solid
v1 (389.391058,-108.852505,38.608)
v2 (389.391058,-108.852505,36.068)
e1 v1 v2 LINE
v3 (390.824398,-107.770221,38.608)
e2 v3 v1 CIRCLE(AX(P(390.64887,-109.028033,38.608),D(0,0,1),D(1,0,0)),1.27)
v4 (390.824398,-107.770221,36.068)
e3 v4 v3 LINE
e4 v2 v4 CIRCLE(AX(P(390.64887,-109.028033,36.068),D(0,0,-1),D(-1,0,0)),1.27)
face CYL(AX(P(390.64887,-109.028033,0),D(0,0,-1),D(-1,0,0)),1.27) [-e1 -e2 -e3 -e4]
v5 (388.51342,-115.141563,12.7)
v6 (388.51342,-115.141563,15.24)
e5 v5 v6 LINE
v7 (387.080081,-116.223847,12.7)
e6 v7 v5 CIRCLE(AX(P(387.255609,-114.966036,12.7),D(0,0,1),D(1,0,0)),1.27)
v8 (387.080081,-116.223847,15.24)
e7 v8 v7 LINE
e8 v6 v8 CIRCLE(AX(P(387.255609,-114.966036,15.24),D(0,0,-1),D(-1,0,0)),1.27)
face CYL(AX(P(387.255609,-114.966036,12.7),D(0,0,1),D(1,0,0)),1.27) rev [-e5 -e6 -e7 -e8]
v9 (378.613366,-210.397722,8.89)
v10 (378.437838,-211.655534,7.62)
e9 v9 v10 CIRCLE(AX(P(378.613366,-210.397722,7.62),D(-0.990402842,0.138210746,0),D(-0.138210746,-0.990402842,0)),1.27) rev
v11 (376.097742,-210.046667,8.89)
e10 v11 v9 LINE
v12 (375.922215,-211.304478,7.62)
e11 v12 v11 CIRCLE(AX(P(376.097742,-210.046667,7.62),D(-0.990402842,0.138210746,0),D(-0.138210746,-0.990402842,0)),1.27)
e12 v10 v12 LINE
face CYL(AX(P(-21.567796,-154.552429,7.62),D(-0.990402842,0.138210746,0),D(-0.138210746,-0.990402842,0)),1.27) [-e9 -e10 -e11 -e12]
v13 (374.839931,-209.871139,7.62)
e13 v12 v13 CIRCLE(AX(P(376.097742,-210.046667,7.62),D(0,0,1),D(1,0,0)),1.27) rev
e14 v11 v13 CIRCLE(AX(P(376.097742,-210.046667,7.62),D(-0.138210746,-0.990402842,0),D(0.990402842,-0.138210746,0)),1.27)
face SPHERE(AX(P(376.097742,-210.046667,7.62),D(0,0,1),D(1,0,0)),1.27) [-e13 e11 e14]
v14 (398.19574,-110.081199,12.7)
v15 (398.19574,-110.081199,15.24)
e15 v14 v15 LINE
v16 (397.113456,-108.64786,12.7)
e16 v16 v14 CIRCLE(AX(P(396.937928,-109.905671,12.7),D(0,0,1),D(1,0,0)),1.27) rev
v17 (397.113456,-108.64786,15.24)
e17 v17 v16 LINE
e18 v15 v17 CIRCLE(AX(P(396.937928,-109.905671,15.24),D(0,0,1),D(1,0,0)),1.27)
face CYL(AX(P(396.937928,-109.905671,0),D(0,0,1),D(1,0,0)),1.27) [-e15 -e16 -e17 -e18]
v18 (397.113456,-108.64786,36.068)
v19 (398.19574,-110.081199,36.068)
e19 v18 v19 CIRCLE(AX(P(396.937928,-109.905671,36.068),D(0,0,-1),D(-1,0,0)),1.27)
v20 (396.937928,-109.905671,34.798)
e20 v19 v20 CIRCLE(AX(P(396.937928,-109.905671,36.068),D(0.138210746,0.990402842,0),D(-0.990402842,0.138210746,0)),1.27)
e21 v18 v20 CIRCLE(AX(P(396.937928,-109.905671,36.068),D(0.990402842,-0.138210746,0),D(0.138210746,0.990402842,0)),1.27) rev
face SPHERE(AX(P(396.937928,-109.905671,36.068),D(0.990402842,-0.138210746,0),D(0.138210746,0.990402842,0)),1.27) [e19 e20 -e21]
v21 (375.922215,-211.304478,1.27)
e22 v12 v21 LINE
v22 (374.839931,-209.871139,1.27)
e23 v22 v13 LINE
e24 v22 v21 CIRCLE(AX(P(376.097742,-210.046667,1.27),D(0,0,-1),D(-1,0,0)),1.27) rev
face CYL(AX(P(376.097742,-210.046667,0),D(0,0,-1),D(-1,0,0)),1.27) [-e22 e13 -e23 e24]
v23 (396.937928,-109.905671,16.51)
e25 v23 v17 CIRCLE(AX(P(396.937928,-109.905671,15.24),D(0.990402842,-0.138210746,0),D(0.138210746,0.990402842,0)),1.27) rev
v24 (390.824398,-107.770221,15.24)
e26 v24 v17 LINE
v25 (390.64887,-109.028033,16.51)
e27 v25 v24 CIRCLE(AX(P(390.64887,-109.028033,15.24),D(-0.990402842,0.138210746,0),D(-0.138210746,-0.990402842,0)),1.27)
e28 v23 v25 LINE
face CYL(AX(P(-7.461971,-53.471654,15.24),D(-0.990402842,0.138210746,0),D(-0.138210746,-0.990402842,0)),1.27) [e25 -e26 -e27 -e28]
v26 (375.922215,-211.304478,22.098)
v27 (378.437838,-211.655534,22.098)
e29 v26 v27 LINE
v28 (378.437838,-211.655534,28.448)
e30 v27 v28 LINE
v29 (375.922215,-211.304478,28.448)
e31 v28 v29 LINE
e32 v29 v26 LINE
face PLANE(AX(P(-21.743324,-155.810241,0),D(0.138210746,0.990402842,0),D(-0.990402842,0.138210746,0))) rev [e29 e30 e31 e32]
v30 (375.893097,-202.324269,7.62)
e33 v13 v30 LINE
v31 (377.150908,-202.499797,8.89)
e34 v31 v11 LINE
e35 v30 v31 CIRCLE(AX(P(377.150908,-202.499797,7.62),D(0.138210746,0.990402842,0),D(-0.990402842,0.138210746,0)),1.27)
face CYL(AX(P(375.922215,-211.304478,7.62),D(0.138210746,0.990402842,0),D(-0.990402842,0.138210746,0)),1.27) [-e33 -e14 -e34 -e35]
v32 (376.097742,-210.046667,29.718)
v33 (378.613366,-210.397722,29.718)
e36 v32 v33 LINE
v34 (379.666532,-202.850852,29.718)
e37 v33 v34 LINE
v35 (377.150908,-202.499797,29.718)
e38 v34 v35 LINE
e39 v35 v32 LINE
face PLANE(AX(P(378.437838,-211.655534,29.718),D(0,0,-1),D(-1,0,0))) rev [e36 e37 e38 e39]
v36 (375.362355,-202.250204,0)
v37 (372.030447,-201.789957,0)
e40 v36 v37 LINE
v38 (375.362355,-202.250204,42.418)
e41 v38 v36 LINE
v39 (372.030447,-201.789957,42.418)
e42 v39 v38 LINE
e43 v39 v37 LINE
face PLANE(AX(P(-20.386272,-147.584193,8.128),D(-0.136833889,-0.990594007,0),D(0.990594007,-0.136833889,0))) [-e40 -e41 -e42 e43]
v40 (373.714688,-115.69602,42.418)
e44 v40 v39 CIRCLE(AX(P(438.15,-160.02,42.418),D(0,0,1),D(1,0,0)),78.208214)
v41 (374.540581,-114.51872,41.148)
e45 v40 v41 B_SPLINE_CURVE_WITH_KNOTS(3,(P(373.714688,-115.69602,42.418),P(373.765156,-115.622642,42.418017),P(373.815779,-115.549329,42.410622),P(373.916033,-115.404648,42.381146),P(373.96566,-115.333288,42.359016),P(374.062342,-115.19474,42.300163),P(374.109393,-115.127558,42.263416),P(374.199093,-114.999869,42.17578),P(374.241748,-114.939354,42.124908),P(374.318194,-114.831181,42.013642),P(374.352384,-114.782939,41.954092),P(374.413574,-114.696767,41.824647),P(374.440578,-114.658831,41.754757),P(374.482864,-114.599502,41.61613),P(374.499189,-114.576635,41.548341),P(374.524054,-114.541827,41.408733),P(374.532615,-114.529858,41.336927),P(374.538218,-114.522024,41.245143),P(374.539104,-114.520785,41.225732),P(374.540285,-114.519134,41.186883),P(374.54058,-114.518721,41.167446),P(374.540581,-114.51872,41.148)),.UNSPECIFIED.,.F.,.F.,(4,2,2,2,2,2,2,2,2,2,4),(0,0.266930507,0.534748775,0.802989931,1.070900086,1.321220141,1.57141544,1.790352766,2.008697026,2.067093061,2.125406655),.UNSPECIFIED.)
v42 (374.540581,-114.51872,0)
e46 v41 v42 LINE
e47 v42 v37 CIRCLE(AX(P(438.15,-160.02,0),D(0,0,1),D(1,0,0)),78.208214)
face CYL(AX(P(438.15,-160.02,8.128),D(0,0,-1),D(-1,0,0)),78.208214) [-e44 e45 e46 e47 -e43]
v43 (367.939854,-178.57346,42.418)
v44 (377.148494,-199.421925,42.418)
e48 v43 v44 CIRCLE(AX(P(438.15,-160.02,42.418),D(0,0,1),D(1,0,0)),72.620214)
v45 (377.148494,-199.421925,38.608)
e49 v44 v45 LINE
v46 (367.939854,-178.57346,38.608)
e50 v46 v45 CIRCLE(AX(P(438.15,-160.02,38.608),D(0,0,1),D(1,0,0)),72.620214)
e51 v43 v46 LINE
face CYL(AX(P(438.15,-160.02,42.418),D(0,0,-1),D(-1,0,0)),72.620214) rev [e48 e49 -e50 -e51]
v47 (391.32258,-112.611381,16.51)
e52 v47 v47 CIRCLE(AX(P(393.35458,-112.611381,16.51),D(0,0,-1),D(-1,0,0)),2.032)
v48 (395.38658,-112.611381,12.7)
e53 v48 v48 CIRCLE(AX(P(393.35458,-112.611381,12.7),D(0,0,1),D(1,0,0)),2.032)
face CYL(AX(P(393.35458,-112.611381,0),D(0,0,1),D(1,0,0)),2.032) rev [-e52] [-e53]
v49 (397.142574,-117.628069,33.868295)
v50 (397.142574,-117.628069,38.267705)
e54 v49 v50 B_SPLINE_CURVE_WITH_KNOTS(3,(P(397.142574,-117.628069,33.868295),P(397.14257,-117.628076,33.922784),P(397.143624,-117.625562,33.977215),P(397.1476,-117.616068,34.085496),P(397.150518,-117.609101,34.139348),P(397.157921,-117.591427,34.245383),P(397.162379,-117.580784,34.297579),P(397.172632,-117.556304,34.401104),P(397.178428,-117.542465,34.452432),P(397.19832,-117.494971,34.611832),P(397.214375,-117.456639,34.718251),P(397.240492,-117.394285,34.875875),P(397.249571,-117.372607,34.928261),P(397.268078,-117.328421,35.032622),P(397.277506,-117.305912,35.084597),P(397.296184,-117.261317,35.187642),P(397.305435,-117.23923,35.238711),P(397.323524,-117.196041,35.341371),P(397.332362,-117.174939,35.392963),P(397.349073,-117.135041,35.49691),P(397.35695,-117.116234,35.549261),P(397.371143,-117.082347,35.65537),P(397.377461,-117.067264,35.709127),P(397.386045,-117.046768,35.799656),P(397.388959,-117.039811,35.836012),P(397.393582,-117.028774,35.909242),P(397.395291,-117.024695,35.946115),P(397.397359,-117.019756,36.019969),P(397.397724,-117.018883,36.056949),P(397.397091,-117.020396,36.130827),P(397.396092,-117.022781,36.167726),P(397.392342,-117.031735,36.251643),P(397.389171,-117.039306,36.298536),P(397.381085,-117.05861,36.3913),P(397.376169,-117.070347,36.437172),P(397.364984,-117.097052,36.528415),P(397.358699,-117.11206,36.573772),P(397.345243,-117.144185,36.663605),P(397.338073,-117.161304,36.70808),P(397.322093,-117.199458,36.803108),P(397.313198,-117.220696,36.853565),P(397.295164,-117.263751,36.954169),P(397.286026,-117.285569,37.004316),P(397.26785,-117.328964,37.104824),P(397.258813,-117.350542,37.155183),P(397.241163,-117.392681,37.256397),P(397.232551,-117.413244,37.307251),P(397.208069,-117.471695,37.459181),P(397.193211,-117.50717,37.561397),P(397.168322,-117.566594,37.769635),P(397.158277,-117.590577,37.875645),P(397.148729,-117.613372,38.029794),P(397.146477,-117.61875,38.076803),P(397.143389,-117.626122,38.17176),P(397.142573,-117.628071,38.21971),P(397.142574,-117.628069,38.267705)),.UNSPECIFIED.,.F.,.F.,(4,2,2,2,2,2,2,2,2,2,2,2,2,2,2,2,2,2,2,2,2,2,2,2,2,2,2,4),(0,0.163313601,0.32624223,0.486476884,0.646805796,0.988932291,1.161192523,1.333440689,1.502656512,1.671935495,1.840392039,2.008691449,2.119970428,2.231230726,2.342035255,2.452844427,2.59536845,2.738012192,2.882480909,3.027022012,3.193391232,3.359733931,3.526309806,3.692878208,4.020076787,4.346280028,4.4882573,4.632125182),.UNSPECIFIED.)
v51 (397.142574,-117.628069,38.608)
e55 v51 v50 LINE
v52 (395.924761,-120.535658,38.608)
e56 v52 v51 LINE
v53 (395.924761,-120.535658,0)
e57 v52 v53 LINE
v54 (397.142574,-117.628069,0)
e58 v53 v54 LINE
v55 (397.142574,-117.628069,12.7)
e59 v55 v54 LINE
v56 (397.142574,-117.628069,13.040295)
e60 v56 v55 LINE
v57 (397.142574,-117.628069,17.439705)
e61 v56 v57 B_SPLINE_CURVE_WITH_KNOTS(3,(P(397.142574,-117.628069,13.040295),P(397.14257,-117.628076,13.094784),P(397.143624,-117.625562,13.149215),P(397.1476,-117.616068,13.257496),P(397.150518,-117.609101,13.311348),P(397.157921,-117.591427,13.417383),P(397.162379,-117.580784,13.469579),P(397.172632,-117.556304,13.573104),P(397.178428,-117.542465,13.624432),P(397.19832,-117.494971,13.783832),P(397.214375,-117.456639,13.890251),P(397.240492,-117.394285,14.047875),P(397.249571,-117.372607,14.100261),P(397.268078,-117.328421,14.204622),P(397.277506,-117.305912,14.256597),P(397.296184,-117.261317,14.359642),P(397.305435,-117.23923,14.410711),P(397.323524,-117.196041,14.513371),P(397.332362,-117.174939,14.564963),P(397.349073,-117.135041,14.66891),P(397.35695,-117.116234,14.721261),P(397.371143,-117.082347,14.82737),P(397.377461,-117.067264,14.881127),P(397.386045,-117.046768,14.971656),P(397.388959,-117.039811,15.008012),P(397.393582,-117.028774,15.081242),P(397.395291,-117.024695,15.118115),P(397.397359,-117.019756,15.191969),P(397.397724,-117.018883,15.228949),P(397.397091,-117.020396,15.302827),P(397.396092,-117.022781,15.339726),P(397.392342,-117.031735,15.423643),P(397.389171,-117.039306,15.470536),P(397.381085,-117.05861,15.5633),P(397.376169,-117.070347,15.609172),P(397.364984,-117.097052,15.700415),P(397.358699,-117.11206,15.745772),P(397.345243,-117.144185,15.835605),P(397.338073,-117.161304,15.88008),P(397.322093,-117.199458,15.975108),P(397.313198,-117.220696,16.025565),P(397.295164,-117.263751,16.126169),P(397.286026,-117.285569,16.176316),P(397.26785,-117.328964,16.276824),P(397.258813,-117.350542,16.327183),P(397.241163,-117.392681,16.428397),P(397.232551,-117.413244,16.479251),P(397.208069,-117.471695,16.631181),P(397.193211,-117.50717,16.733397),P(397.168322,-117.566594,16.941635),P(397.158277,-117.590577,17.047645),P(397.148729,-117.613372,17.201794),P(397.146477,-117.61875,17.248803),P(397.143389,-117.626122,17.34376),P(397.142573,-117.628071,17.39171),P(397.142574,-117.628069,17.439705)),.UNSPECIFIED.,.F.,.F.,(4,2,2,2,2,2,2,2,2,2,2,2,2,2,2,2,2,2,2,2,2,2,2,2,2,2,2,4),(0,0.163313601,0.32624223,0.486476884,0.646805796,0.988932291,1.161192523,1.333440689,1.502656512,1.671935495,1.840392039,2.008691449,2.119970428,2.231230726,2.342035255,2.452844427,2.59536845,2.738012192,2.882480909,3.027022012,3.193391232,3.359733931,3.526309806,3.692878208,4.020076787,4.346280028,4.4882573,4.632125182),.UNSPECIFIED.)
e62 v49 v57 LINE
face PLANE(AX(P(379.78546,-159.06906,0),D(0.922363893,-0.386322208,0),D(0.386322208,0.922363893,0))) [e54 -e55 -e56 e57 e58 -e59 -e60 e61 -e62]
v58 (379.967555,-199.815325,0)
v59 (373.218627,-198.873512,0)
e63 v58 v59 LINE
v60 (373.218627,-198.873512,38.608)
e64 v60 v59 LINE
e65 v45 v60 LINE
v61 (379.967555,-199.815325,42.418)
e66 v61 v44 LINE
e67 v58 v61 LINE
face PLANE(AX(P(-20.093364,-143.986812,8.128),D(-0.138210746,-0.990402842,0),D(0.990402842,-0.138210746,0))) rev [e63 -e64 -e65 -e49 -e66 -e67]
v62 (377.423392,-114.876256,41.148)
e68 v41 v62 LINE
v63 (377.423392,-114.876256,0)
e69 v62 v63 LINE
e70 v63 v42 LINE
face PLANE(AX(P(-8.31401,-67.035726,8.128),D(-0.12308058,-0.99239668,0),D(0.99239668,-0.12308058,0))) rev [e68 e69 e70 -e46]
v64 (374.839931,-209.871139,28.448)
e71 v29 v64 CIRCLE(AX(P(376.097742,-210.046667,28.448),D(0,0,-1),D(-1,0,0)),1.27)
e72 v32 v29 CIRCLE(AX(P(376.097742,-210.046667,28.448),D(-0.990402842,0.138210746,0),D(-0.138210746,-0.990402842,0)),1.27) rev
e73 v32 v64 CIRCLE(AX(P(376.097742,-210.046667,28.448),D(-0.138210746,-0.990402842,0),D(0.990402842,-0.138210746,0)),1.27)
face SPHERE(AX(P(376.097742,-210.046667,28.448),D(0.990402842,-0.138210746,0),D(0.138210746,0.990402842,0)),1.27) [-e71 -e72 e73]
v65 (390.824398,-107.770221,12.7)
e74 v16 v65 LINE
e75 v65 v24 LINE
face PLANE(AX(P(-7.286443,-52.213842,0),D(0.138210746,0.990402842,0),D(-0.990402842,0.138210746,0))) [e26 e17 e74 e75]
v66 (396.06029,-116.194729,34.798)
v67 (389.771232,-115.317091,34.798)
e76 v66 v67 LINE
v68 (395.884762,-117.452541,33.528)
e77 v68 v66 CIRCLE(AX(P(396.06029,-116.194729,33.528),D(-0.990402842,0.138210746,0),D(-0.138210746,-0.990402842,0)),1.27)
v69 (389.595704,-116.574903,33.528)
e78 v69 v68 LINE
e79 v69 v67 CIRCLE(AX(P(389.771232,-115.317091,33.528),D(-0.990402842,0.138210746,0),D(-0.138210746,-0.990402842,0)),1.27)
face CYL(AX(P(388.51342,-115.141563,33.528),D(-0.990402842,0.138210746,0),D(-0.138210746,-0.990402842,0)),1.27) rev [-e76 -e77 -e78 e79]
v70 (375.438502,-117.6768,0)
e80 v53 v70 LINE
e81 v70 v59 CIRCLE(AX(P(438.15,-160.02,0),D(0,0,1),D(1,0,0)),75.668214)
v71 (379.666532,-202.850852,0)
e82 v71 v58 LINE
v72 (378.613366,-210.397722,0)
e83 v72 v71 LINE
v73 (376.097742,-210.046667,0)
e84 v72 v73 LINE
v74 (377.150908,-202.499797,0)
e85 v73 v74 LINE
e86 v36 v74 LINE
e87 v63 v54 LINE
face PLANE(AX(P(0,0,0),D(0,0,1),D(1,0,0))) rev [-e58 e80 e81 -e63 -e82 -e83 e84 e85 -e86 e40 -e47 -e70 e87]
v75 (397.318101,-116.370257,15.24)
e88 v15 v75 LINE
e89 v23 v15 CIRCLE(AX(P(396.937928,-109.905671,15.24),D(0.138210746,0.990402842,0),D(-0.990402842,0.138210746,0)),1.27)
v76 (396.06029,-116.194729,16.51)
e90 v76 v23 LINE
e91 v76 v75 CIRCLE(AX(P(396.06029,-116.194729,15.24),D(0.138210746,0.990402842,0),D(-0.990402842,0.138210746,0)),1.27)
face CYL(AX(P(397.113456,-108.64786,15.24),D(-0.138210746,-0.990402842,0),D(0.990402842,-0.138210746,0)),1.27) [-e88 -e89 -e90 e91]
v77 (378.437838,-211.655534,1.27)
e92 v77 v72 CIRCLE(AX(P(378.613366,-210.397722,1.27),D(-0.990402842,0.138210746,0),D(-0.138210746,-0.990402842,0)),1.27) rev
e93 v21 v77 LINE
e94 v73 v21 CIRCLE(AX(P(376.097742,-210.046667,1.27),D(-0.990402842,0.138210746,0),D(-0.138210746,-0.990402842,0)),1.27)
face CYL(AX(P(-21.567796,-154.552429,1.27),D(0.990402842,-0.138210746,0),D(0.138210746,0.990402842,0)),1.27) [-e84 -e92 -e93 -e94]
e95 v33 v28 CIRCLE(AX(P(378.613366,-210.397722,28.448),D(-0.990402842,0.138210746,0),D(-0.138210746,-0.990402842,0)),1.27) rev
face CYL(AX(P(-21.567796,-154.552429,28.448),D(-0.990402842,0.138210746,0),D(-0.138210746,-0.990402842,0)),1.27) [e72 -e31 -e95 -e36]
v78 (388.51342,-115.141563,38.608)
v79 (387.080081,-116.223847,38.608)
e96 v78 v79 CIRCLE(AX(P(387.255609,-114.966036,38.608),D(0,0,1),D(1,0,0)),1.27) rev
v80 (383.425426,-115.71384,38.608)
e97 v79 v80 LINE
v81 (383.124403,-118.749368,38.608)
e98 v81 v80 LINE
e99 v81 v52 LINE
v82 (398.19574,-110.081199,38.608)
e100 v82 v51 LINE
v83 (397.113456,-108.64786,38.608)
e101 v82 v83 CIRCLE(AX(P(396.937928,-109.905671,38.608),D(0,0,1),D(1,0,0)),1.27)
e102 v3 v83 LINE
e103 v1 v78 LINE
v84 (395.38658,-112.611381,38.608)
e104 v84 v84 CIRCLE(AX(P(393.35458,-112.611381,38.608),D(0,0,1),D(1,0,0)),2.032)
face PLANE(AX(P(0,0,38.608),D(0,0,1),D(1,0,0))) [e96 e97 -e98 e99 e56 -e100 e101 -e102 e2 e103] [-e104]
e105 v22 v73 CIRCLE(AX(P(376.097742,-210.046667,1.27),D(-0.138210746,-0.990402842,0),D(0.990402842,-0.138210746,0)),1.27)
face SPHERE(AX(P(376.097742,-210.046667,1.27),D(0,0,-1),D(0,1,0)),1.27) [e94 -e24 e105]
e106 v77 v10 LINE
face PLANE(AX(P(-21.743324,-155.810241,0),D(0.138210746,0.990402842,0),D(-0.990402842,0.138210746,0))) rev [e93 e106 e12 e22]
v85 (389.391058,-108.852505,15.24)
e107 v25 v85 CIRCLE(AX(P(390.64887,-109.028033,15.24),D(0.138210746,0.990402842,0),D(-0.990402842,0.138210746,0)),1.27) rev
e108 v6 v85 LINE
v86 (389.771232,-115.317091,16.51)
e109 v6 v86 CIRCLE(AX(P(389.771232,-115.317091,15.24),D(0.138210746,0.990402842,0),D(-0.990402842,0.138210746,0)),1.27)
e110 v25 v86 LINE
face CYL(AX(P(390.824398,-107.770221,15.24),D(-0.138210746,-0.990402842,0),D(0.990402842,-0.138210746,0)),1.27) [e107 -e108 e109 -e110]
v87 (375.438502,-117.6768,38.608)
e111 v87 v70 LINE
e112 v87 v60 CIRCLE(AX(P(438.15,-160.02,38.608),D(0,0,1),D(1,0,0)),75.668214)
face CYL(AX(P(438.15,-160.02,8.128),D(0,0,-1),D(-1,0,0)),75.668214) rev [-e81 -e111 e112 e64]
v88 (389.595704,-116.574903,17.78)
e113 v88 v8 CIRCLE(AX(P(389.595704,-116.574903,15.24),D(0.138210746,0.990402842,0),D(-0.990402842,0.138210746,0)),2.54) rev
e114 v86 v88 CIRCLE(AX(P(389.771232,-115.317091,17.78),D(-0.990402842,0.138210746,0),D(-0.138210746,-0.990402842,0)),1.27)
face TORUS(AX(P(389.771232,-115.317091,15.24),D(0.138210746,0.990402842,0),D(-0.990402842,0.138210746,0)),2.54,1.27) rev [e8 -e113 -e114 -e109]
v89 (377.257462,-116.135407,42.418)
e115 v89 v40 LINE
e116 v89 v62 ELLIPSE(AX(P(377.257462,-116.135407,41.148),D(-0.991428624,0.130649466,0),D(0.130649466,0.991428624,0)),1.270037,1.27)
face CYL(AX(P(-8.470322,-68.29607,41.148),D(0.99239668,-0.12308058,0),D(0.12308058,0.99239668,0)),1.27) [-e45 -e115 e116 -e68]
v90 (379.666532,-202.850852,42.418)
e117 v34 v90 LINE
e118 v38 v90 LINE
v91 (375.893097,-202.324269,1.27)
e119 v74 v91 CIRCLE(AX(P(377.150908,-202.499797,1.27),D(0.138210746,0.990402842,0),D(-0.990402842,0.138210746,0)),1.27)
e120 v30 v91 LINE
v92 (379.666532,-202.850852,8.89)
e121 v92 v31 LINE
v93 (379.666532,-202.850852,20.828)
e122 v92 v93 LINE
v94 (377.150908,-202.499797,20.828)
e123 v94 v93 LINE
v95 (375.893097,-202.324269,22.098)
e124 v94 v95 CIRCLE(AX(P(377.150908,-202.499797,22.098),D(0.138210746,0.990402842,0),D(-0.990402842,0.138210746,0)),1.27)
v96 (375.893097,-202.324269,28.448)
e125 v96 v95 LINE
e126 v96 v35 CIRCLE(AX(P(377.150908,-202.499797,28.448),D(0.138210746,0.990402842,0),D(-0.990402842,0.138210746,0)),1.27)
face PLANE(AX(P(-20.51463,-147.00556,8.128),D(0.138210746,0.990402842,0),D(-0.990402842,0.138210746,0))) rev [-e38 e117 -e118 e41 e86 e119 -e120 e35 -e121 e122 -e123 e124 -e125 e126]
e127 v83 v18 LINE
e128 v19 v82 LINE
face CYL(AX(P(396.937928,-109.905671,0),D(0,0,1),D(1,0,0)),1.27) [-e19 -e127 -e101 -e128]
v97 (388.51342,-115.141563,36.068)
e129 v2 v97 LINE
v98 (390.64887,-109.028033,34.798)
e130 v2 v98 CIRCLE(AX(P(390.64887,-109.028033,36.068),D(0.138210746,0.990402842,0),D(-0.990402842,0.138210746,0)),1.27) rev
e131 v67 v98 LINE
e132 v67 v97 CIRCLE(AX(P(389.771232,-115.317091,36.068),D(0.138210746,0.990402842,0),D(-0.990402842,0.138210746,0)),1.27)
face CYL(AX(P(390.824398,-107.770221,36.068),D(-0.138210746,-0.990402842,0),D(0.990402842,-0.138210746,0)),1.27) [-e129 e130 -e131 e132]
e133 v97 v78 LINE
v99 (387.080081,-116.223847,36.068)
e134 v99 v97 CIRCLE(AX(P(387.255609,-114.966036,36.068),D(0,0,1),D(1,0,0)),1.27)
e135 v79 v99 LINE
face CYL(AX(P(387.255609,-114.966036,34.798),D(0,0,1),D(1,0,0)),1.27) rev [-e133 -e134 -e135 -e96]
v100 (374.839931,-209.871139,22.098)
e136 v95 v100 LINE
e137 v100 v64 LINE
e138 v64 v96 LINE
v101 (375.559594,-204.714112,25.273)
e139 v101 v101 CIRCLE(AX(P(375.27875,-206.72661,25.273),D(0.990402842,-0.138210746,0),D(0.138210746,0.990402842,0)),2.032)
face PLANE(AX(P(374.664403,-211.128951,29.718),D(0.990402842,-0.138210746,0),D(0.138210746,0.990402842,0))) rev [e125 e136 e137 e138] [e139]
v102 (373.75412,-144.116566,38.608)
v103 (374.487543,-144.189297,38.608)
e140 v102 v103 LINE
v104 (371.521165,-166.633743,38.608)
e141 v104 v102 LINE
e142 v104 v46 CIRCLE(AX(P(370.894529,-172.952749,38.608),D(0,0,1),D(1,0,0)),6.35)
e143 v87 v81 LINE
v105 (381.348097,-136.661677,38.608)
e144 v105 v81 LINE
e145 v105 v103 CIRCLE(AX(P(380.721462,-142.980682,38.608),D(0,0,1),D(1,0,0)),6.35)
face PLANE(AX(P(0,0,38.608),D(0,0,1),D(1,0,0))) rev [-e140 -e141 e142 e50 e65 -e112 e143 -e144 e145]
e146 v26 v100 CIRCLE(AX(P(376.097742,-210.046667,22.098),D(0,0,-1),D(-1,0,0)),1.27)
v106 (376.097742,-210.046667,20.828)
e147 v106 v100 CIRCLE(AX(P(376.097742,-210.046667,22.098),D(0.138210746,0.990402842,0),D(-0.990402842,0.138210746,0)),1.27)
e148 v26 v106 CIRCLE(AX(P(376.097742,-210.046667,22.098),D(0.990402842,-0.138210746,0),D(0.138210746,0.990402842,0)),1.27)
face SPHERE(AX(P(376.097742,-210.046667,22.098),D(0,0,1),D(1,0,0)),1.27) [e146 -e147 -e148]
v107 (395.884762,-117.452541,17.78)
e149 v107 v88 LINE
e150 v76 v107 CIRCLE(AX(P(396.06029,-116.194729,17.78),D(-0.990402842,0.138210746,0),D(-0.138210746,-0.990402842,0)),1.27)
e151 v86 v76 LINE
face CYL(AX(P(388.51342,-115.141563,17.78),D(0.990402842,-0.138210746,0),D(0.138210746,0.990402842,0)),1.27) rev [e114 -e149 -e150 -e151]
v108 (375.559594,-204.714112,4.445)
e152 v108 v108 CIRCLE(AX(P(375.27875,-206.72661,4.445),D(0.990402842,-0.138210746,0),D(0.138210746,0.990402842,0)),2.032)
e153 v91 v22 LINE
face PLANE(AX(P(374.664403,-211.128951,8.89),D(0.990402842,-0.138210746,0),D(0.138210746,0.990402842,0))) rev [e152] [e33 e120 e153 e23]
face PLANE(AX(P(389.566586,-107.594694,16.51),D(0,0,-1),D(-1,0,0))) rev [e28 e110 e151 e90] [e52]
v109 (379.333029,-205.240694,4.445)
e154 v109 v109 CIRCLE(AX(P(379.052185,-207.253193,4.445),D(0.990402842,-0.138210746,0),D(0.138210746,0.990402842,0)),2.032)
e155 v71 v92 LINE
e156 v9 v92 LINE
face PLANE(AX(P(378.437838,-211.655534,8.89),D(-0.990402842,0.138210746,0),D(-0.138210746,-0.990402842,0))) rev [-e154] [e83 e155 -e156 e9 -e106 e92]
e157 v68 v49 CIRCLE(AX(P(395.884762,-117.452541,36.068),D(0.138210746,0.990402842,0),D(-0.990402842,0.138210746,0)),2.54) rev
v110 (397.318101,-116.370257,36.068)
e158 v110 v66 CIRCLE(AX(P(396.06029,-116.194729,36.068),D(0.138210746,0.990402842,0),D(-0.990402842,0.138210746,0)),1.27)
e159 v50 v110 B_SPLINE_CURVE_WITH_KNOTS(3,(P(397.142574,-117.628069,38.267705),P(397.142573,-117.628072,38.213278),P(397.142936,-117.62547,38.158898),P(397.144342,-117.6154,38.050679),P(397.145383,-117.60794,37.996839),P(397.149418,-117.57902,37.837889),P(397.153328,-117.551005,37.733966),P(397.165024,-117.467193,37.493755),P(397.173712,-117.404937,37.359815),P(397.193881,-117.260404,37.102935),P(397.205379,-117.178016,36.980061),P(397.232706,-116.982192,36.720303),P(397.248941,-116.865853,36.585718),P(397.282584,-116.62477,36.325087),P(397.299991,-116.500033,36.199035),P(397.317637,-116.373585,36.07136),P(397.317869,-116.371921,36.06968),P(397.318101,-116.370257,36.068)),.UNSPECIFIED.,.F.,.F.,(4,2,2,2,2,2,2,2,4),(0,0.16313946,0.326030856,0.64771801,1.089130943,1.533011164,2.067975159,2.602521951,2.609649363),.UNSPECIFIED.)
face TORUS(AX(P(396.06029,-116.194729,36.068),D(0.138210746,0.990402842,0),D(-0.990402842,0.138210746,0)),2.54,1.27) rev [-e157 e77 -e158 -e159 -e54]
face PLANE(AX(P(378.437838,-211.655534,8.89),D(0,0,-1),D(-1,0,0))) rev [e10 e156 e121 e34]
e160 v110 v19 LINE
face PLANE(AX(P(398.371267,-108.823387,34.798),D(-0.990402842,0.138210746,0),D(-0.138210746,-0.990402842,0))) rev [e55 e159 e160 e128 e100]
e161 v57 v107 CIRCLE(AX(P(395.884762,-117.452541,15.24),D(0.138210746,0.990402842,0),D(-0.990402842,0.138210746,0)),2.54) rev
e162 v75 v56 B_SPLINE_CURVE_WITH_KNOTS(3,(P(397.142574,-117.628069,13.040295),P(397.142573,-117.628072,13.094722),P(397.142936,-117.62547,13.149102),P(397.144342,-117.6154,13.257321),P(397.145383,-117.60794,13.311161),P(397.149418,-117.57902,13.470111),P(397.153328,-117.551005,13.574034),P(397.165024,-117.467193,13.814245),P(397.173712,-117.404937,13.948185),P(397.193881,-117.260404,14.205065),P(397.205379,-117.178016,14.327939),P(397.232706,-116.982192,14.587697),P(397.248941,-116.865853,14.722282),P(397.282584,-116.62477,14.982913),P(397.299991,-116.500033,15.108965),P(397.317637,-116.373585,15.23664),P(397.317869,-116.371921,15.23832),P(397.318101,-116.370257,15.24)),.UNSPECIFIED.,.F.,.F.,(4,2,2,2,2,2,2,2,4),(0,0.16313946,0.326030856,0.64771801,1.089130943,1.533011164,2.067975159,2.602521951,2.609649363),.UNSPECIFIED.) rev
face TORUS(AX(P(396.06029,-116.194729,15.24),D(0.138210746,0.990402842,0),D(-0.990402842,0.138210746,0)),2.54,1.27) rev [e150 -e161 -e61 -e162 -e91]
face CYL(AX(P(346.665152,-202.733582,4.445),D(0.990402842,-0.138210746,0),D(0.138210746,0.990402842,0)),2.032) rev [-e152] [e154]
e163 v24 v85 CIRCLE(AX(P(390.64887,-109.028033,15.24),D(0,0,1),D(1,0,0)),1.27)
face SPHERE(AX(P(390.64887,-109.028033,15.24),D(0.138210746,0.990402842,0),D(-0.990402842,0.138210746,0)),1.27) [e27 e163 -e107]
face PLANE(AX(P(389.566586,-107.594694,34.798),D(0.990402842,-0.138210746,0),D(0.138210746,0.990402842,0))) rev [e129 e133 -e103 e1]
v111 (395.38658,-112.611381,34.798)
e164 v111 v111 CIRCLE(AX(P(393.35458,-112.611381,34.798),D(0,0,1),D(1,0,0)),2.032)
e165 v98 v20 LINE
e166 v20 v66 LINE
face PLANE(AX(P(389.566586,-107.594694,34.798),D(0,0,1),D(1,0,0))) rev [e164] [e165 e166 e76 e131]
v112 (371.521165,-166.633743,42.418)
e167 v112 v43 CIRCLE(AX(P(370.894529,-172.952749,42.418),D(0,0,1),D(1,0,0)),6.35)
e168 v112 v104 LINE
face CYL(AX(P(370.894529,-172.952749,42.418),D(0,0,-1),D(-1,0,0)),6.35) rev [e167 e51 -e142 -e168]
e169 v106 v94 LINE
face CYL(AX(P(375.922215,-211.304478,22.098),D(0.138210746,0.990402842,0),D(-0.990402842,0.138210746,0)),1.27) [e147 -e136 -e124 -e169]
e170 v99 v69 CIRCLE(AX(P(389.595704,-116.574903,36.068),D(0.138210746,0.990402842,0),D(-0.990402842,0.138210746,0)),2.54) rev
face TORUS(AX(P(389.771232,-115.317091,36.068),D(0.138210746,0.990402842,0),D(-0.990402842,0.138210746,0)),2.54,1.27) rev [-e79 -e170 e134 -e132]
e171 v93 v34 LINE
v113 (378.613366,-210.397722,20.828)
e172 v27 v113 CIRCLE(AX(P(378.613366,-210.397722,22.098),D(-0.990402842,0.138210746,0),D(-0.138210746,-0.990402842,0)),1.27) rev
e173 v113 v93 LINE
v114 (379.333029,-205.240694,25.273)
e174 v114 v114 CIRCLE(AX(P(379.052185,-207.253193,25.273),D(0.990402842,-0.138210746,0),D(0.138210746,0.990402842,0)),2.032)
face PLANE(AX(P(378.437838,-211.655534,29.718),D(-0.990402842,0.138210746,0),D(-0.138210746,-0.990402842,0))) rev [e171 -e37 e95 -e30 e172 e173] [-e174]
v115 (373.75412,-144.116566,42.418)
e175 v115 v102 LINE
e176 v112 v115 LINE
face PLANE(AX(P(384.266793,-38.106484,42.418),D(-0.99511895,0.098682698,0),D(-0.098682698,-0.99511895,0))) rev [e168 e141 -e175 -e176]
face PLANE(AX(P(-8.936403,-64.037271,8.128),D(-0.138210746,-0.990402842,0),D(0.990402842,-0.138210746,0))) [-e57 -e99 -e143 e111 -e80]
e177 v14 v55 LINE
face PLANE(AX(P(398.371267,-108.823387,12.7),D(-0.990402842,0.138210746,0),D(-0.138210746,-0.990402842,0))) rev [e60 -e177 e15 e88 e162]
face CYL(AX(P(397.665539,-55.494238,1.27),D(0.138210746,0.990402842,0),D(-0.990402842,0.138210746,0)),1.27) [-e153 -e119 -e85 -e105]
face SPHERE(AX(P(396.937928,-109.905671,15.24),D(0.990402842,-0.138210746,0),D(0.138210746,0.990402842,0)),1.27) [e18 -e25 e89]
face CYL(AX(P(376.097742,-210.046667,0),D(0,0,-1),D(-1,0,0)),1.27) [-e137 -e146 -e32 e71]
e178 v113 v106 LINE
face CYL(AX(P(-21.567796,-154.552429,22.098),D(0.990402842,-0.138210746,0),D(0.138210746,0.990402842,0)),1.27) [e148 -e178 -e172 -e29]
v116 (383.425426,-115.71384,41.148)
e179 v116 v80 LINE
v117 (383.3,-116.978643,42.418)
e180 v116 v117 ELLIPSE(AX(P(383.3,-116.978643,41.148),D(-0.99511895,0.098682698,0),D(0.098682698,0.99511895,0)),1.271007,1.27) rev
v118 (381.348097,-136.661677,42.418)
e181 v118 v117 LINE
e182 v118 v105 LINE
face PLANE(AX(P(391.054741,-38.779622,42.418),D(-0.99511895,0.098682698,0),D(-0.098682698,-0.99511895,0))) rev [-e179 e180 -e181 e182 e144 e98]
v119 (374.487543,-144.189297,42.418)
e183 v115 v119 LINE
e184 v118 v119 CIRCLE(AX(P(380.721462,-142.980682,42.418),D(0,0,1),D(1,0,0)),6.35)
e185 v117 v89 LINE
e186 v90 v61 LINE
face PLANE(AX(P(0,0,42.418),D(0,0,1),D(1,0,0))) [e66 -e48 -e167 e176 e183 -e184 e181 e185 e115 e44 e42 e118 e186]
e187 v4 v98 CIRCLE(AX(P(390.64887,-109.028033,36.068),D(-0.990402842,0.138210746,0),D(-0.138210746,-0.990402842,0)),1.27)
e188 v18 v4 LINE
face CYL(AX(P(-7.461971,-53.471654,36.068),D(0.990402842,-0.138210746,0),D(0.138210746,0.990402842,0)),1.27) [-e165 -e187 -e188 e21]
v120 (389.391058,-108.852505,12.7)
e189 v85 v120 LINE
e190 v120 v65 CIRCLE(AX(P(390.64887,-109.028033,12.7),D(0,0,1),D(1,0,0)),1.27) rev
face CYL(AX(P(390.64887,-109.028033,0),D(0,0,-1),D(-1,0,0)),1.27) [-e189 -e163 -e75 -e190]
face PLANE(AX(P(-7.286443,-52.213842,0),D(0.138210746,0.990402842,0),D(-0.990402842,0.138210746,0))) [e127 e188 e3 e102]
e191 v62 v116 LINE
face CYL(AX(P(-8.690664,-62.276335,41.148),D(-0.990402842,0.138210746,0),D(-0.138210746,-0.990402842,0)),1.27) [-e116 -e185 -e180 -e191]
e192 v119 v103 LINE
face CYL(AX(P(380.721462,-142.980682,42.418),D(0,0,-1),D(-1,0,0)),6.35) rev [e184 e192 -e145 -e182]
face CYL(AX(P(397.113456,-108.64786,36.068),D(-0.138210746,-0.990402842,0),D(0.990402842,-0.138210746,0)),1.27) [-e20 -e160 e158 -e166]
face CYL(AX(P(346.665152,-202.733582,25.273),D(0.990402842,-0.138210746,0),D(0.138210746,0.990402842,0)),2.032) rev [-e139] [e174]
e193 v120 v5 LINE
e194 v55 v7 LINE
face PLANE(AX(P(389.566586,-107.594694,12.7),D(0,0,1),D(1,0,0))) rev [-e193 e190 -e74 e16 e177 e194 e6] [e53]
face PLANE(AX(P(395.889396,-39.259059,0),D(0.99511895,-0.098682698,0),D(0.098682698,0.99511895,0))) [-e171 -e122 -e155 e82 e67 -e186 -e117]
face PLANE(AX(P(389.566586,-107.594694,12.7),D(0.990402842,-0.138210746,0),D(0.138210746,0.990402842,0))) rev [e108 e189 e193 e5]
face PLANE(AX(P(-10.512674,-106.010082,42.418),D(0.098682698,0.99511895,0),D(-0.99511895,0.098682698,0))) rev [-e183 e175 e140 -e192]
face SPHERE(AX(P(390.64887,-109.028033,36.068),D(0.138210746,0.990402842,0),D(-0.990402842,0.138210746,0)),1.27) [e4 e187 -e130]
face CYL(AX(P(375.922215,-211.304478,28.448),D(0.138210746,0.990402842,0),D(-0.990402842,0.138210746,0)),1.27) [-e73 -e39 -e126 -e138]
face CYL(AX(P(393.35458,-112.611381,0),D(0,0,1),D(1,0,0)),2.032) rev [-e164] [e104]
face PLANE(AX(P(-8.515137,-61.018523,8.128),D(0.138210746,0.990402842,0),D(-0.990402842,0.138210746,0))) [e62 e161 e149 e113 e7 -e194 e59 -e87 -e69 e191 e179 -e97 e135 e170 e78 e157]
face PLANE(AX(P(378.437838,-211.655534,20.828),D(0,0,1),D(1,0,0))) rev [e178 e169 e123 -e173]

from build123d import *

# Parameters (mm, degrees)
SKETCH1_R                = 4.445
BOSS_EXTRUDE2_DEPTH      = 8.128
BOSS_EXTRUDE3_DEPTH      = 30.48
CUT_EXTRUDE1_START       = -38.608
CUT_EXTRUDE1_OUTLINE_R   = 4.445
CUT_EXTRUDE1_DEPTH       = 38.608
BOSS_EXTRUDE13_DEPTH     = 3.81
BOSS_EXTRUDE14_DEPTH     = 8.128
BOSS_EXTRUDE15_OUTLINE_W = 8.89
BOSS_EXTRUDE15_OUTLINE_H = 3.81
BOSS_EXTRUDE15_DEPTH     = 8.89
SKETCH10_W               = 3.81
SKETCH10_H               = 8.89
BOSS_EXTRUDE16_DEPTH     = 8.89
SKETCH11_R               = 2.032
CUT_EXTRUDE3_DEPTH       = 453.756346398
SKETCH12_R               = 2.032
CUT_EXTRUDE4_DEPTH       = 167.419125065
FILLET1_R                = 1.27
FILLET2_R                = 1.27
FILLET3_R                = 1.27


# Read off the part's stored shape, not the designer's step: Cut-Extrude1, Boss-Extrude15
with BuildPart() as part:
    # Sketch1 → Boss-Extrude2 (new body)
    with BuildSketch(Plane.XY):
        with BuildLine():
            Line((422.721831239, -137.260955008), (397.142573767, -117.628068619))
            Line((397.142573767, -117.628068619), (377.42339183, -114.876256201))
            Line((377.42339183, -114.876256201), (374.540581179, -114.51871973))
            ThreePointArc((374.540581179, -114.51871973), (359.974116362, -157.771470169), (372.030446696, -201.789957384))
            Line((372.030446696, -201.789957384), (375.362354889, -202.25020442))
            Line((375.362354889, -202.25020442), (407.292032563, -206.705991877))
            Line((407.292032563, -206.705991877), (428.301760664, -185.691281663))
            ThreePointArc((428.301760664, -185.691281663), (410.835199313, -163.167091308), (422.721831239, -137.260955008))
        make_face()
        with Locations((413.081283236, -189.895733265)):
            Circle(SKETCH1_R, mode=Mode.SUBTRACT)
        with BuildLine():
            Line((375.438501949, -117.676800355), (395.924761017, -120.535658409))
            Line((395.924761017, -120.535658409), (403.250926595, -126.158721416))
            Line((403.250926595, -126.158721416), (396.525446728, -140.500644454))
            ThreePointArc((396.525446728, -140.500644454), (394.840250533, -144.59682662), (393.557057048, -148.836167256))
            Line((393.557057048, -148.836167256), (408.135947471, -152.492527686))
            ThreePointArc((408.135947471, -152.492527686), (407.478732389, -164.116282679), (411.163311063, -175.160172021))
            Line((411.163311063, -175.160172021), (398.054918567, -182.514290852))
            ThreePointArc((398.054918567, -182.514290852), (404.027476783, -190.830097132), (411.692336104, -197.617881552))
            ThreePointArc((411.692336104, -197.617881552), (411.8058947, -197.693319009), (411.923337289, -197.76255486))
            Line((411.923337289, -197.76255486), (406.209814322, -203.477432695))
            Line((406.209814322, -203.477432695), (373.21862712, -198.873511552))
            ThreePointArc((373.21862712, -198.873511552), (362.510049562, -157.95204405), (375.438501949, -117.676800355))
        make_face(mode=Mode.SUBTRACT)
        with Locations((404.375009271, -140.520000011)):
            Circle(SKETCH1_R, mode=Mode.SUBTRACT)
    extrude(amount=BOSS_EXTRUDE2_DEPTH)


with BuildPart() as body_2:
    # Sketch2 → Boss-Extrude3 (new body)
    with BuildSketch(Plane.XY.offset(8.128)):
        with BuildLine():
            Line((397.142573767, -117.628068619), (377.42339183, -114.876256201))
            Line((377.42339183, -114.876256201), (374.540581179, -114.51871973))
            ThreePointArc((374.540581179, -114.51871973), (359.974116362, -157.771470169), (372.030446696, -201.789957384))
            Line((372.030446696, -201.789957384), (375.362354889, -202.25020442))
            Line((375.362354889, -202.25020442), (407.292032563, -206.705991877))
            Line((407.292032563, -206.705991877), (414.532433241, -199.463874257))
            ThreePointArc((414.532433241, -199.463874257), (409.852770309, -196.253623443), (405.604270928, -192.491282623))
            ThreePointArc((405.604270928, -192.491282623), (405.997230199, -190.639893213), (406.27151817, -188.767241124))
            ThreePointArc((406.27151817, -188.767241124), (395.867947628, -167.427396522), (398.397521154, -143.821793259))
            ThreePointArc((398.397521154, -143.821793259), (398.461114435, -137.105611235), (404.245702044, -133.692446827))
            ThreePointArc((404.245702044, -133.692446827), (407.006708255, -130.47787998), (410.071206758, -127.551201961))
            Line((410.071206758, -127.551201961), (397.142573767, -117.628068619))
        make_face()
        with BuildLine():
            ThreePointArc((403.061727172, -189.725585097), (401.059193553, -196.35778198), (397.415632908, -202.25020442))
            Line((397.415632908, -202.25020442), (373.21862712, -198.873511552))
            ThreePointArc((373.21862712, -198.873511552), (362.510049562, -157.95204405), (375.438501949, -117.676800355))
            Line((375.438501949, -117.676800355), (395.924761017, -120.535658409))
            Line((395.924761017, -120.535658409), (400.202083686, -123.818638382))
            ThreePointArc((400.202083686, -123.818638382), (401.150247915, -126.46196405), (401.831128402, -129.1864067))
            Line((401.831128402, -129.1864067), (400.808060919, -131.368073344))
            ThreePointArc((400.808060919, -131.368073344), (395.439235277, -136.441663908), (395.124115066, -143.821793259))
            ThreePointArc((395.124115066, -143.821793259), (392.848289911, -167.853501069), (403.061727172, -189.725585097))
        make_face(mode=Mode.SUBTRACT)
    extrude(amount=BOSS_EXTRUDE3_DEPTH)


with BuildPart() as cut_extrude1_tool:
    # Cut-Extrude1 outline → Cut-Extrude1 (new body)
    with BuildSketch(Plane.XY.offset(38.608).offset(CUT_EXTRUDE1_START)):
        with BuildLine():
            Line((397.142573767, -117.628068619), (395.924761017, -120.535658409))
            Line((395.924761017, -120.535658409), (400.202083686, -123.818638382))
            ThreePointArc((400.202083686, -123.818638382), (401.150247915, -126.46196405), (401.831128402, -129.1864067))
            Line((401.831128402, -129.1864067), (400.808060919, -131.368073344))
            ThreePointArc((400.808060919, -131.368073344), (395.439235277, -136.441663908), (395.124115066, -143.821793259))
            ThreePointArc((395.124115066, -143.821793259), (394.268902285, -146.306578133), (393.557057048, -148.836167256))
            ThreePointArc((393.557057048, -148.836167256), (392.580609278, -166.105992541), (398.054918568, -182.514290852))
            ThreePointArc((398.054918568, -182.514290852), (400.385798954, -186.239721497), (403.061727172, -189.725585097))
            ThreePointArc((403.061727172, -189.725585097), (401.059193553, -196.35778198), (397.415632908, -202.25020442))
            Line((397.415632908, -202.25020442), (379.967554953, -199.815324629))
            Line((379.967554953, -199.815324629), (379.666531571, -202.850852403))
            Line((379.666531571, -202.850852403), (407.292032563, -206.705991877))
            Line((407.292032563, -206.705991877), (428.301760664, -185.691281663))
            ThreePointArc((428.301760664, -185.691281663), (410.835199313, -163.167091308), (422.721831239, -137.260955008))
            Line((422.721831239, -137.260955008), (397.142573767, -117.628068619))
        make_face()
        with BuildLine():
            Line((411.923337289, -197.76255486), (411.913410508, -197.772483995))
            ThreePointArc((411.913410508, -197.772483995), (411.802759907, -197.695344929), (411.692336104, -197.617881552))
            ThreePointArc((411.692336104, -197.617881552), (411.8058947, -197.693319009), (411.923337289, -197.76255486))
        make_face(mode=Mode.SUBTRACT)
        with BuildLine():
            Line((411.163311063, -175.160172021), (400.71315601, -181.022956652))
            ThreePointArc((400.71315601, -181.022956652), (395.601784353, -165.702501323), (396.513495254, -149.57763683))
            Line((396.513495254, -149.57763683), (408.135947471, -152.492527686))
            ThreePointArc((408.135947471, -152.492527686), (407.478732389, -164.116282679), (411.163311063, -175.160172021))
        make_face(mode=Mode.SUBTRACT)
        with Locations((404.375009271, -140.520000011)):
            Circle(CUT_EXTRUDE1_OUTLINE_R, mode=Mode.SUBTRACT)
        with Locations((413.081283236, -189.895733265)):
            Circle(CUT_EXTRUDE1_OUTLINE_R, mode=Mode.SUBTRACT)
    extrude(amount=CUT_EXTRUDE1_DEPTH)


with BuildPart() as part_1:
    add(part.part)

    # Cut-Extrude1: cut by cut_extrude1_tool
    add(cut_extrude1_tool.part, mode=Mode.SUBTRACT)



with BuildPart() as body_2_1:
    add(body_2.part)

    # Cut-Extrude1: cut by cut_extrude1_tool
    add(cut_extrude1_tool.part, mode=Mode.SUBTRACT)

    # Sketch6 → Boss-Extrude13 (add)
    with BuildSketch(Plane.XY.offset(38.608)):
        with BuildLine():
            Line((377.42339183, -114.876256201), (374.540581179, -114.51871973))
            ThreePointArc((374.540581179, -114.51871973), (359.974116362, -157.771470169), (372.030446696, -201.789957384))
            Line((372.030446696, -201.789957384), (375.362354889, -202.25020442))
            Line((375.362354889, -202.25020442), (379.666531571, -202.850852403))
            Line((379.666531571, -202.850852403), (379.967554953, -199.815324629))
            Line((379.967554953, -199.81532463), (377.148493798, -199.421924563))
            ThreePointArc((377.148493798, -199.421924563), (371.721173342, -189.361206639), (367.93985441, -178.573459905))
            ThreePointArc((367.93985441, -178.573459905), (364.812247711, -171.128372205), (371.521164554, -166.633743264))
            Line((371.521164554, -166.633743264), (373.754119512, -144.116566189))
            Line((373.754119512, -144.116566189), (374.487542914, -144.189297394))
            ThreePointArc((374.487542914, -144.189297394), (376.02820359, -138.703320505), (381.348097321, -136.661676945))
            Line((381.348097321, -136.661676945), (383.425425917, -115.713840234))
            Line((383.425425917, -115.713840234), (377.42339183, -114.876256201))
        make_face()
    extrude(amount=BOSS_EXTRUDE13_DEPTH)


with BuildPart() as part_2:
    add(part_1.part)

    add(body_2_1.part)  # Boss-Extrude14 merges body 2
    # Sketch7 → Boss-Extrude14 (add)
    with BuildSketch(Plane(origin=(0, 0, 8.128), x_dir=(-1, 0, 0), z_dir=(0, 0, -1))):
        with BuildLine():
            Line((-380.886266304, -115.359500436), (-383.425425917, -115.713840234))
            Line((-383.425425917, -115.713840234), (-383.124402536, -118.749368007))
            Line((-383.124402536, -118.749368007), (-378.816626061, -118.148217674))
            ThreePointArc((-378.816626061, -118.148217674), (-379.834773745, -116.741485643), (-380.886266304, -115.359500436))
        make_face()
    extrude(amount=BOSS_EXTRUDE14_DEPTH)

    # Boss-Extrude15 outline → Boss-Extrude15 (add)
    with BuildSketch(Plane(origin=(-8.515136706, -61.018523217, 0), x_dir=(0.9904028421684975, -0.13821074569136185, 0), z_dir=(0.13821074569136185, 0.9904028421684975, 0))):
        with Locations((405.143596883, -36.703)):
            Rectangle(BOSS_EXTRUDE15_OUTLINE_W, BOSS_EXTRUDE15_OUTLINE_H)
        with Locations((405.143596883, -14.605)):
            Rectangle(BOSS_EXTRUDE15_OUTLINE_W, BOSS_EXTRUDE15_OUTLINE_H)
    extrude(amount=BOSS_EXTRUDE15_DEPTH)

    # Sketch10 → Boss-Extrude16 (add)
    with BuildSketch(Plane(origin=(-20.514630148, -147.00555954, 0), x_dir=(0.9904028421684976, -0.1382107456913612, 0), z_dir=(-0.1382107456913612, -0.9904028421684976, 0))):
        with Locations((402.153979519, 25.273)):
            Rectangle(SKETCH10_W, SKETCH10_H)
        with Locations((402.153979519, 4.445)):
            Rectangle(SKETCH10_W, SKETCH10_H)
    extrude(amount=BOSS_EXTRUDE16_DEPTH)

    # Sketch11 → Cut-Extrude3 (cut, through all)
    with BuildSketch(Plane.XY.offset(38.608)):
        with Locations((393.354579898, -112.611381221)):
            Circle(SKETCH11_R)
    extrude(amount=-CUT_EXTRUDE3_DEPTH, mode=Mode.SUBTRACT)

    # Sketch12 → Cut-Extrude4 (cut, through all)
    with BuildSketch(Plane(origin=(400.181161719, -55.845292863, 0), x_dir=(0, 0, -1), z_dir=(0.9904028421684976, -0.13821074569136127, 0))):
        with Locations(Location((-25.273, -152.875066313, 0), (0, 0, 90))):
            Circle(SKETCH12_R)
        with Locations(Location((-4.445, -152.875066313, 0), (0, 0, 90))):
            Circle(SKETCH12_R)
    extrude(amount=-CUT_EXTRUDE4_DEPTH, mode=Mode.SUBTRACT)

    # Fillet1
    fillet1_edges = [part_2.edges().sort_by_distance(p)[0] for p in [
        (374.664403213, -211.128950728, 4.445),
        (375.278749978, -206.726610095, 8.89),
        (375.278749978, -206.726610095, 0),
        (376.551120627, -211.392242199, 0),
        (376.551120627, -211.392242199, 8.89),
        (375.278749978, -206.726610095, 20.828),
        (376.551120627, -211.392242199, 20.828),
        (376.551120627, -211.392242199, 29.718),
        (380.424408874, -115.295048218, 42.418),
        (388.952239265, -111.997034457, 34.798),
        (397.756920532, -113.225727986, 34.798),
        (393.968926663, -108.209040588, 34.798),
        (389.566586029, -107.594693823, 36.703),
        (398.371267296, -108.823387352, 36.703),
        (388.952239265, -111.997034457, 16.51),
        (389.566586029, -107.594693823, 14.605),
        (398.371267296, -108.823387352, 14.605),
        (393.968926663, -108.209040588, 16.51),
        (397.756920532, -113.225727986, 16.51),
        (375.981986505, -114.697487965, 42.418),
    ]]
    fillet(fillet1_edges, radius=FILLET1_R)

    # Fillet2
    # the kernel refuses this fillet: 1.27 mm, written as the material it adds along each edge
    with BuildSketch(Plane(origin=(388.3378925, -116.39937509, 12.7), x_dir=(-0.9904028421685107, 0.13821074569126718, 0), z_dir=(0, 0, 1))) as fillet2_piece_1:
        with BuildLine():
            CenterArc((FILLET2_R, -FILLET2_R), FILLET2_R, 90, 90)
            Line((0, -FILLET2_R), (0, 0))
            Line((0, 0), (FILLET2_R, 0))
        make_face()
    extrude(amount=2.54)
    with BuildSketch(Plane(origin=(388.3378925, -116.39937509, 36.068), x_dir=(0.1382107456913754, 0.9904028421684955, 0), z_dir=(0, 0, 1))) as fillet2_piece_2:
        with BuildLine():
            CenterArc((FILLET2_R, FILLET2_R), FILLET2_R, 180, 90)
            Line((0, FILLET2_R), (0, 0))
            Line((0, 0), (FILLET2_R, 0))
        make_face()
    extrude(amount=2.54)
    with BuildSketch(Plane(origin=(395.884762157, -117.452540972, 34.798), x_dir=(0.13821074569136185, 0.9904028421684975, 0), z_dir=(-0.9904028421684975, 0.13821074569136185, 0))) as fillet2_piece_3:
        with BuildLine():
            CenterArc((FILLET2_R, FILLET2_R), FILLET2_R, 180, 90)
            Line((0, FILLET2_R), (0, 0))
            Line((0, 0), (FILLET2_R, 0))
        make_face()
    extrude(amount=6.35)
    with BuildSketch(Plane(origin=(389.59570411, -116.574902737, 16.51), x_dir=(0, 0, 1), z_dir=(0.9904028421684975, -0.13821074569136185, 0))) as fillet2_piece_4:
        with BuildLine():
            CenterArc((FILLET2_R, -FILLET2_R), FILLET2_R, 90, 90)
            Line((0, -FILLET2_R), (0, 0))
            Line((0, 0), (FILLET2_R, 0))
        make_face()
    extrude(amount=6.35)
    with BuildSketch(Plane(origin=(389.59570411, -116.574902737, 36.068), x_dir=(-0.9904028421684968, 0.13821074569136593, 0), z_dir=(0, 0, 1))) as fillet2_piece_5:
        with BuildLine():
            CenterArc((1.27 + FILLET2_R, -FILLET2_R), FILLET2_R, 90, 90)
            Line((1.27 + FILLET2_R, 0), (1.27, 0))
            Line((1.27, 0), (1.27, -FILLET2_R))
        make_face()
    revolve(axis=Axis((389.59570411, -116.574902737, 36.068), (-0.13821074569136182, -0.9904028421684975, 0)), revolution_arc=90)
    with BuildSketch(Plane(origin=(395.884762157, -117.452540972, 36.068), x_dir=(-0.7940497732926407, 0.11080966916708068, 0.597667277632788), z_dir=(-0.5919313704386218, 0.08260404011695381, -0.8017442392976778))) as fillet2_piece_6_section:
        with BuildLine():
            CenterArc((1.27 + FILLET2_R, FILLET2_R), FILLET2_R, 180, 90)
            Line((1.27 + FILLET2_R, 0), (1.27, 0))
            Line((1.27, 0), (1.27, FILLET2_R))
        make_face()
    fillet2_piece_6 = revolve(axis=Axis((395.884762157, -117.452540972, 36.068), (0.13821074569136182, 0.9904028421684975, 0)), revolution_arc=233.296989237, mode=Mode.PRIVATE)
    fillet2_piece_6 = split(fillet2_piece_6, bisect_by=Plane(origin=(397.316474441, -117.212871927, 36.083951898), z_dir=(-0.9223638930566347, 0.3863222085065898, 0)), keep=Keep.TOP, mode=Mode.PRIVATE)
    add(fillet2_piece_6)
    with BuildSketch(Plane(origin=(389.59570411, -116.574902737, 15.24), x_dir=(0, 0, 1), z_dir=(0.9904028421684975, -0.13821074569136182, 0))) as fillet2_piece_7:
        with BuildLine():
            CenterArc((1.27 + FILLET2_R, -FILLET2_R), FILLET2_R, 90, 90)
            Line((1.27, -FILLET2_R), (1.27, 0))
            Line((1.27, 0), (1.27 + FILLET2_R, 0))
        make_face()
    revolve(axis=Axis((389.59570411, -116.574902737, 15.24), (-0.13821074569136182, -0.9904028421684975, 0)), revolution_arc=90)
    with BuildSketch(Plane(origin=(395.884762157, -117.452540972, 15.24), x_dir=(-0.79404977329264, 0.11080966916708059, -0.5976672776327889), z_dir=(-0.5919313704386227, 0.08260404011695394, 0.8017442392976771))) as fillet2_piece_8_section:
        with BuildLine():
            CenterArc((1.27 + FILLET2_R, -FILLET2_R), FILLET2_R, 90, 90)
            Line((1.27, -FILLET2_R), (1.27, 0))
            Line((1.27, 0), (1.27 + FILLET2_R, 0))
        make_face()
    fillet2_piece_8 = revolve(axis=Axis((395.884762157, -117.452540972, 15.24), (-0.13821074569136182, -0.9904028421684975, 0)), revolution_arc=233.296989237, mode=Mode.PRIVATE)
    fillet2_piece_8 = split(fillet2_piece_8, bisect_by=Plane(origin=(397.316474722, -117.212871258, 15.224053427), z_dir=(-0.9223638930566347, 0.3863222085065898, 0)), keep=Keep.TOP, mode=Mode.PRIVATE)
    add(fillet2_piece_8)

    # Fillet3
    # the kernel refuses this fillet: 1.27 mm, written as the material it takes off along each edge
    with BuildSketch(Plane(origin=(376.09774247, -210.046666766, 22.098), x_dir=(-0.1382107456913612, -0.9904028421684976, 0), z_dir=(-0.9904028421684976, 0.1382107456913612, 0))) as fillet3_piece_1_section:
        Polygon((0, 0), (FILLET3_R, 0), (FILLET3_R, -FILLET3_R), (0, -FILLET3_R), align=None)
    fillet3_piece_1 = extrude(amount=FILLET3_R, mode=Mode.PRIVATE)
    fillet3_piece_1 = fillet3_piece_1 - Plane(origin=(376.09774247, -210.046666766, 22.098), x_dir=(0.0977297555112109, 0.7003205658037746, 0.7071067811865475), z_dir=(-0.9904028421684976, 0.1382107456913612, 0)) * Sphere(FILLET3_R, mode=Mode.PRIVATE)
    add(fillet3_piece_1, mode=Mode.SUBTRACT)
    with BuildSketch(Plane(origin=(374.664403213, -211.128950728, 28.448), x_dir=(0.13821074569137695, 0.9904028421684954, 0), z_dir=(0, 0, -1))) as fillet3_piece_2:
        with BuildLine():
            CenterArc((FILLET3_R, FILLET3_R), FILLET3_R, 180, 90)
            Line((0, FILLET3_R), (0, 0))
            Line((0, 0), (FILLET3_R, 0))
        make_face()
    extrude(amount=6.35, mode=Mode.SUBTRACT)
    with BuildSketch(Plane(origin=(375.893096742, -202.324269462, 29.718), x_dir=(0, 0, -1), z_dir=(-0.1382107456913612, -0.9904028421684976, 0))) as fillet3_piece_3:
        with BuildLine():
            CenterArc((FILLET3_R, FILLET3_R), FILLET3_R, 180, 90)
            Line((0, FILLET3_R), (0, 0))
            Line((0, 0), (FILLET3_R, 0))
        make_face()
    extrude(amount=7.62, mode=Mode.SUBTRACT)
    with BuildSketch(Plane(origin=(374.83993086, -209.871139119, 28.448), x_dir=(0, 0, 1), z_dir=(0.1382107456913612, 0.9904028421684976, 0))) as fillet3_piece_4:
        with BuildLine():
            CenterArc((1.27 - FILLET3_R, FILLET3_R), FILLET3_R, 270, 90)
            Line((1.27, FILLET3_R), (1.27, 0))
            Line((1.27, 0), (1.27 - FILLET3_R, 0))
        make_face()
    revolve(axis=Axis((374.83993086, -209.871139119, 28.448), (0.9904028421684976, -0.1382107456913612, 0)), revolution_arc=90, mode=Mode.SUBTRACT)


solid = part_2.part
